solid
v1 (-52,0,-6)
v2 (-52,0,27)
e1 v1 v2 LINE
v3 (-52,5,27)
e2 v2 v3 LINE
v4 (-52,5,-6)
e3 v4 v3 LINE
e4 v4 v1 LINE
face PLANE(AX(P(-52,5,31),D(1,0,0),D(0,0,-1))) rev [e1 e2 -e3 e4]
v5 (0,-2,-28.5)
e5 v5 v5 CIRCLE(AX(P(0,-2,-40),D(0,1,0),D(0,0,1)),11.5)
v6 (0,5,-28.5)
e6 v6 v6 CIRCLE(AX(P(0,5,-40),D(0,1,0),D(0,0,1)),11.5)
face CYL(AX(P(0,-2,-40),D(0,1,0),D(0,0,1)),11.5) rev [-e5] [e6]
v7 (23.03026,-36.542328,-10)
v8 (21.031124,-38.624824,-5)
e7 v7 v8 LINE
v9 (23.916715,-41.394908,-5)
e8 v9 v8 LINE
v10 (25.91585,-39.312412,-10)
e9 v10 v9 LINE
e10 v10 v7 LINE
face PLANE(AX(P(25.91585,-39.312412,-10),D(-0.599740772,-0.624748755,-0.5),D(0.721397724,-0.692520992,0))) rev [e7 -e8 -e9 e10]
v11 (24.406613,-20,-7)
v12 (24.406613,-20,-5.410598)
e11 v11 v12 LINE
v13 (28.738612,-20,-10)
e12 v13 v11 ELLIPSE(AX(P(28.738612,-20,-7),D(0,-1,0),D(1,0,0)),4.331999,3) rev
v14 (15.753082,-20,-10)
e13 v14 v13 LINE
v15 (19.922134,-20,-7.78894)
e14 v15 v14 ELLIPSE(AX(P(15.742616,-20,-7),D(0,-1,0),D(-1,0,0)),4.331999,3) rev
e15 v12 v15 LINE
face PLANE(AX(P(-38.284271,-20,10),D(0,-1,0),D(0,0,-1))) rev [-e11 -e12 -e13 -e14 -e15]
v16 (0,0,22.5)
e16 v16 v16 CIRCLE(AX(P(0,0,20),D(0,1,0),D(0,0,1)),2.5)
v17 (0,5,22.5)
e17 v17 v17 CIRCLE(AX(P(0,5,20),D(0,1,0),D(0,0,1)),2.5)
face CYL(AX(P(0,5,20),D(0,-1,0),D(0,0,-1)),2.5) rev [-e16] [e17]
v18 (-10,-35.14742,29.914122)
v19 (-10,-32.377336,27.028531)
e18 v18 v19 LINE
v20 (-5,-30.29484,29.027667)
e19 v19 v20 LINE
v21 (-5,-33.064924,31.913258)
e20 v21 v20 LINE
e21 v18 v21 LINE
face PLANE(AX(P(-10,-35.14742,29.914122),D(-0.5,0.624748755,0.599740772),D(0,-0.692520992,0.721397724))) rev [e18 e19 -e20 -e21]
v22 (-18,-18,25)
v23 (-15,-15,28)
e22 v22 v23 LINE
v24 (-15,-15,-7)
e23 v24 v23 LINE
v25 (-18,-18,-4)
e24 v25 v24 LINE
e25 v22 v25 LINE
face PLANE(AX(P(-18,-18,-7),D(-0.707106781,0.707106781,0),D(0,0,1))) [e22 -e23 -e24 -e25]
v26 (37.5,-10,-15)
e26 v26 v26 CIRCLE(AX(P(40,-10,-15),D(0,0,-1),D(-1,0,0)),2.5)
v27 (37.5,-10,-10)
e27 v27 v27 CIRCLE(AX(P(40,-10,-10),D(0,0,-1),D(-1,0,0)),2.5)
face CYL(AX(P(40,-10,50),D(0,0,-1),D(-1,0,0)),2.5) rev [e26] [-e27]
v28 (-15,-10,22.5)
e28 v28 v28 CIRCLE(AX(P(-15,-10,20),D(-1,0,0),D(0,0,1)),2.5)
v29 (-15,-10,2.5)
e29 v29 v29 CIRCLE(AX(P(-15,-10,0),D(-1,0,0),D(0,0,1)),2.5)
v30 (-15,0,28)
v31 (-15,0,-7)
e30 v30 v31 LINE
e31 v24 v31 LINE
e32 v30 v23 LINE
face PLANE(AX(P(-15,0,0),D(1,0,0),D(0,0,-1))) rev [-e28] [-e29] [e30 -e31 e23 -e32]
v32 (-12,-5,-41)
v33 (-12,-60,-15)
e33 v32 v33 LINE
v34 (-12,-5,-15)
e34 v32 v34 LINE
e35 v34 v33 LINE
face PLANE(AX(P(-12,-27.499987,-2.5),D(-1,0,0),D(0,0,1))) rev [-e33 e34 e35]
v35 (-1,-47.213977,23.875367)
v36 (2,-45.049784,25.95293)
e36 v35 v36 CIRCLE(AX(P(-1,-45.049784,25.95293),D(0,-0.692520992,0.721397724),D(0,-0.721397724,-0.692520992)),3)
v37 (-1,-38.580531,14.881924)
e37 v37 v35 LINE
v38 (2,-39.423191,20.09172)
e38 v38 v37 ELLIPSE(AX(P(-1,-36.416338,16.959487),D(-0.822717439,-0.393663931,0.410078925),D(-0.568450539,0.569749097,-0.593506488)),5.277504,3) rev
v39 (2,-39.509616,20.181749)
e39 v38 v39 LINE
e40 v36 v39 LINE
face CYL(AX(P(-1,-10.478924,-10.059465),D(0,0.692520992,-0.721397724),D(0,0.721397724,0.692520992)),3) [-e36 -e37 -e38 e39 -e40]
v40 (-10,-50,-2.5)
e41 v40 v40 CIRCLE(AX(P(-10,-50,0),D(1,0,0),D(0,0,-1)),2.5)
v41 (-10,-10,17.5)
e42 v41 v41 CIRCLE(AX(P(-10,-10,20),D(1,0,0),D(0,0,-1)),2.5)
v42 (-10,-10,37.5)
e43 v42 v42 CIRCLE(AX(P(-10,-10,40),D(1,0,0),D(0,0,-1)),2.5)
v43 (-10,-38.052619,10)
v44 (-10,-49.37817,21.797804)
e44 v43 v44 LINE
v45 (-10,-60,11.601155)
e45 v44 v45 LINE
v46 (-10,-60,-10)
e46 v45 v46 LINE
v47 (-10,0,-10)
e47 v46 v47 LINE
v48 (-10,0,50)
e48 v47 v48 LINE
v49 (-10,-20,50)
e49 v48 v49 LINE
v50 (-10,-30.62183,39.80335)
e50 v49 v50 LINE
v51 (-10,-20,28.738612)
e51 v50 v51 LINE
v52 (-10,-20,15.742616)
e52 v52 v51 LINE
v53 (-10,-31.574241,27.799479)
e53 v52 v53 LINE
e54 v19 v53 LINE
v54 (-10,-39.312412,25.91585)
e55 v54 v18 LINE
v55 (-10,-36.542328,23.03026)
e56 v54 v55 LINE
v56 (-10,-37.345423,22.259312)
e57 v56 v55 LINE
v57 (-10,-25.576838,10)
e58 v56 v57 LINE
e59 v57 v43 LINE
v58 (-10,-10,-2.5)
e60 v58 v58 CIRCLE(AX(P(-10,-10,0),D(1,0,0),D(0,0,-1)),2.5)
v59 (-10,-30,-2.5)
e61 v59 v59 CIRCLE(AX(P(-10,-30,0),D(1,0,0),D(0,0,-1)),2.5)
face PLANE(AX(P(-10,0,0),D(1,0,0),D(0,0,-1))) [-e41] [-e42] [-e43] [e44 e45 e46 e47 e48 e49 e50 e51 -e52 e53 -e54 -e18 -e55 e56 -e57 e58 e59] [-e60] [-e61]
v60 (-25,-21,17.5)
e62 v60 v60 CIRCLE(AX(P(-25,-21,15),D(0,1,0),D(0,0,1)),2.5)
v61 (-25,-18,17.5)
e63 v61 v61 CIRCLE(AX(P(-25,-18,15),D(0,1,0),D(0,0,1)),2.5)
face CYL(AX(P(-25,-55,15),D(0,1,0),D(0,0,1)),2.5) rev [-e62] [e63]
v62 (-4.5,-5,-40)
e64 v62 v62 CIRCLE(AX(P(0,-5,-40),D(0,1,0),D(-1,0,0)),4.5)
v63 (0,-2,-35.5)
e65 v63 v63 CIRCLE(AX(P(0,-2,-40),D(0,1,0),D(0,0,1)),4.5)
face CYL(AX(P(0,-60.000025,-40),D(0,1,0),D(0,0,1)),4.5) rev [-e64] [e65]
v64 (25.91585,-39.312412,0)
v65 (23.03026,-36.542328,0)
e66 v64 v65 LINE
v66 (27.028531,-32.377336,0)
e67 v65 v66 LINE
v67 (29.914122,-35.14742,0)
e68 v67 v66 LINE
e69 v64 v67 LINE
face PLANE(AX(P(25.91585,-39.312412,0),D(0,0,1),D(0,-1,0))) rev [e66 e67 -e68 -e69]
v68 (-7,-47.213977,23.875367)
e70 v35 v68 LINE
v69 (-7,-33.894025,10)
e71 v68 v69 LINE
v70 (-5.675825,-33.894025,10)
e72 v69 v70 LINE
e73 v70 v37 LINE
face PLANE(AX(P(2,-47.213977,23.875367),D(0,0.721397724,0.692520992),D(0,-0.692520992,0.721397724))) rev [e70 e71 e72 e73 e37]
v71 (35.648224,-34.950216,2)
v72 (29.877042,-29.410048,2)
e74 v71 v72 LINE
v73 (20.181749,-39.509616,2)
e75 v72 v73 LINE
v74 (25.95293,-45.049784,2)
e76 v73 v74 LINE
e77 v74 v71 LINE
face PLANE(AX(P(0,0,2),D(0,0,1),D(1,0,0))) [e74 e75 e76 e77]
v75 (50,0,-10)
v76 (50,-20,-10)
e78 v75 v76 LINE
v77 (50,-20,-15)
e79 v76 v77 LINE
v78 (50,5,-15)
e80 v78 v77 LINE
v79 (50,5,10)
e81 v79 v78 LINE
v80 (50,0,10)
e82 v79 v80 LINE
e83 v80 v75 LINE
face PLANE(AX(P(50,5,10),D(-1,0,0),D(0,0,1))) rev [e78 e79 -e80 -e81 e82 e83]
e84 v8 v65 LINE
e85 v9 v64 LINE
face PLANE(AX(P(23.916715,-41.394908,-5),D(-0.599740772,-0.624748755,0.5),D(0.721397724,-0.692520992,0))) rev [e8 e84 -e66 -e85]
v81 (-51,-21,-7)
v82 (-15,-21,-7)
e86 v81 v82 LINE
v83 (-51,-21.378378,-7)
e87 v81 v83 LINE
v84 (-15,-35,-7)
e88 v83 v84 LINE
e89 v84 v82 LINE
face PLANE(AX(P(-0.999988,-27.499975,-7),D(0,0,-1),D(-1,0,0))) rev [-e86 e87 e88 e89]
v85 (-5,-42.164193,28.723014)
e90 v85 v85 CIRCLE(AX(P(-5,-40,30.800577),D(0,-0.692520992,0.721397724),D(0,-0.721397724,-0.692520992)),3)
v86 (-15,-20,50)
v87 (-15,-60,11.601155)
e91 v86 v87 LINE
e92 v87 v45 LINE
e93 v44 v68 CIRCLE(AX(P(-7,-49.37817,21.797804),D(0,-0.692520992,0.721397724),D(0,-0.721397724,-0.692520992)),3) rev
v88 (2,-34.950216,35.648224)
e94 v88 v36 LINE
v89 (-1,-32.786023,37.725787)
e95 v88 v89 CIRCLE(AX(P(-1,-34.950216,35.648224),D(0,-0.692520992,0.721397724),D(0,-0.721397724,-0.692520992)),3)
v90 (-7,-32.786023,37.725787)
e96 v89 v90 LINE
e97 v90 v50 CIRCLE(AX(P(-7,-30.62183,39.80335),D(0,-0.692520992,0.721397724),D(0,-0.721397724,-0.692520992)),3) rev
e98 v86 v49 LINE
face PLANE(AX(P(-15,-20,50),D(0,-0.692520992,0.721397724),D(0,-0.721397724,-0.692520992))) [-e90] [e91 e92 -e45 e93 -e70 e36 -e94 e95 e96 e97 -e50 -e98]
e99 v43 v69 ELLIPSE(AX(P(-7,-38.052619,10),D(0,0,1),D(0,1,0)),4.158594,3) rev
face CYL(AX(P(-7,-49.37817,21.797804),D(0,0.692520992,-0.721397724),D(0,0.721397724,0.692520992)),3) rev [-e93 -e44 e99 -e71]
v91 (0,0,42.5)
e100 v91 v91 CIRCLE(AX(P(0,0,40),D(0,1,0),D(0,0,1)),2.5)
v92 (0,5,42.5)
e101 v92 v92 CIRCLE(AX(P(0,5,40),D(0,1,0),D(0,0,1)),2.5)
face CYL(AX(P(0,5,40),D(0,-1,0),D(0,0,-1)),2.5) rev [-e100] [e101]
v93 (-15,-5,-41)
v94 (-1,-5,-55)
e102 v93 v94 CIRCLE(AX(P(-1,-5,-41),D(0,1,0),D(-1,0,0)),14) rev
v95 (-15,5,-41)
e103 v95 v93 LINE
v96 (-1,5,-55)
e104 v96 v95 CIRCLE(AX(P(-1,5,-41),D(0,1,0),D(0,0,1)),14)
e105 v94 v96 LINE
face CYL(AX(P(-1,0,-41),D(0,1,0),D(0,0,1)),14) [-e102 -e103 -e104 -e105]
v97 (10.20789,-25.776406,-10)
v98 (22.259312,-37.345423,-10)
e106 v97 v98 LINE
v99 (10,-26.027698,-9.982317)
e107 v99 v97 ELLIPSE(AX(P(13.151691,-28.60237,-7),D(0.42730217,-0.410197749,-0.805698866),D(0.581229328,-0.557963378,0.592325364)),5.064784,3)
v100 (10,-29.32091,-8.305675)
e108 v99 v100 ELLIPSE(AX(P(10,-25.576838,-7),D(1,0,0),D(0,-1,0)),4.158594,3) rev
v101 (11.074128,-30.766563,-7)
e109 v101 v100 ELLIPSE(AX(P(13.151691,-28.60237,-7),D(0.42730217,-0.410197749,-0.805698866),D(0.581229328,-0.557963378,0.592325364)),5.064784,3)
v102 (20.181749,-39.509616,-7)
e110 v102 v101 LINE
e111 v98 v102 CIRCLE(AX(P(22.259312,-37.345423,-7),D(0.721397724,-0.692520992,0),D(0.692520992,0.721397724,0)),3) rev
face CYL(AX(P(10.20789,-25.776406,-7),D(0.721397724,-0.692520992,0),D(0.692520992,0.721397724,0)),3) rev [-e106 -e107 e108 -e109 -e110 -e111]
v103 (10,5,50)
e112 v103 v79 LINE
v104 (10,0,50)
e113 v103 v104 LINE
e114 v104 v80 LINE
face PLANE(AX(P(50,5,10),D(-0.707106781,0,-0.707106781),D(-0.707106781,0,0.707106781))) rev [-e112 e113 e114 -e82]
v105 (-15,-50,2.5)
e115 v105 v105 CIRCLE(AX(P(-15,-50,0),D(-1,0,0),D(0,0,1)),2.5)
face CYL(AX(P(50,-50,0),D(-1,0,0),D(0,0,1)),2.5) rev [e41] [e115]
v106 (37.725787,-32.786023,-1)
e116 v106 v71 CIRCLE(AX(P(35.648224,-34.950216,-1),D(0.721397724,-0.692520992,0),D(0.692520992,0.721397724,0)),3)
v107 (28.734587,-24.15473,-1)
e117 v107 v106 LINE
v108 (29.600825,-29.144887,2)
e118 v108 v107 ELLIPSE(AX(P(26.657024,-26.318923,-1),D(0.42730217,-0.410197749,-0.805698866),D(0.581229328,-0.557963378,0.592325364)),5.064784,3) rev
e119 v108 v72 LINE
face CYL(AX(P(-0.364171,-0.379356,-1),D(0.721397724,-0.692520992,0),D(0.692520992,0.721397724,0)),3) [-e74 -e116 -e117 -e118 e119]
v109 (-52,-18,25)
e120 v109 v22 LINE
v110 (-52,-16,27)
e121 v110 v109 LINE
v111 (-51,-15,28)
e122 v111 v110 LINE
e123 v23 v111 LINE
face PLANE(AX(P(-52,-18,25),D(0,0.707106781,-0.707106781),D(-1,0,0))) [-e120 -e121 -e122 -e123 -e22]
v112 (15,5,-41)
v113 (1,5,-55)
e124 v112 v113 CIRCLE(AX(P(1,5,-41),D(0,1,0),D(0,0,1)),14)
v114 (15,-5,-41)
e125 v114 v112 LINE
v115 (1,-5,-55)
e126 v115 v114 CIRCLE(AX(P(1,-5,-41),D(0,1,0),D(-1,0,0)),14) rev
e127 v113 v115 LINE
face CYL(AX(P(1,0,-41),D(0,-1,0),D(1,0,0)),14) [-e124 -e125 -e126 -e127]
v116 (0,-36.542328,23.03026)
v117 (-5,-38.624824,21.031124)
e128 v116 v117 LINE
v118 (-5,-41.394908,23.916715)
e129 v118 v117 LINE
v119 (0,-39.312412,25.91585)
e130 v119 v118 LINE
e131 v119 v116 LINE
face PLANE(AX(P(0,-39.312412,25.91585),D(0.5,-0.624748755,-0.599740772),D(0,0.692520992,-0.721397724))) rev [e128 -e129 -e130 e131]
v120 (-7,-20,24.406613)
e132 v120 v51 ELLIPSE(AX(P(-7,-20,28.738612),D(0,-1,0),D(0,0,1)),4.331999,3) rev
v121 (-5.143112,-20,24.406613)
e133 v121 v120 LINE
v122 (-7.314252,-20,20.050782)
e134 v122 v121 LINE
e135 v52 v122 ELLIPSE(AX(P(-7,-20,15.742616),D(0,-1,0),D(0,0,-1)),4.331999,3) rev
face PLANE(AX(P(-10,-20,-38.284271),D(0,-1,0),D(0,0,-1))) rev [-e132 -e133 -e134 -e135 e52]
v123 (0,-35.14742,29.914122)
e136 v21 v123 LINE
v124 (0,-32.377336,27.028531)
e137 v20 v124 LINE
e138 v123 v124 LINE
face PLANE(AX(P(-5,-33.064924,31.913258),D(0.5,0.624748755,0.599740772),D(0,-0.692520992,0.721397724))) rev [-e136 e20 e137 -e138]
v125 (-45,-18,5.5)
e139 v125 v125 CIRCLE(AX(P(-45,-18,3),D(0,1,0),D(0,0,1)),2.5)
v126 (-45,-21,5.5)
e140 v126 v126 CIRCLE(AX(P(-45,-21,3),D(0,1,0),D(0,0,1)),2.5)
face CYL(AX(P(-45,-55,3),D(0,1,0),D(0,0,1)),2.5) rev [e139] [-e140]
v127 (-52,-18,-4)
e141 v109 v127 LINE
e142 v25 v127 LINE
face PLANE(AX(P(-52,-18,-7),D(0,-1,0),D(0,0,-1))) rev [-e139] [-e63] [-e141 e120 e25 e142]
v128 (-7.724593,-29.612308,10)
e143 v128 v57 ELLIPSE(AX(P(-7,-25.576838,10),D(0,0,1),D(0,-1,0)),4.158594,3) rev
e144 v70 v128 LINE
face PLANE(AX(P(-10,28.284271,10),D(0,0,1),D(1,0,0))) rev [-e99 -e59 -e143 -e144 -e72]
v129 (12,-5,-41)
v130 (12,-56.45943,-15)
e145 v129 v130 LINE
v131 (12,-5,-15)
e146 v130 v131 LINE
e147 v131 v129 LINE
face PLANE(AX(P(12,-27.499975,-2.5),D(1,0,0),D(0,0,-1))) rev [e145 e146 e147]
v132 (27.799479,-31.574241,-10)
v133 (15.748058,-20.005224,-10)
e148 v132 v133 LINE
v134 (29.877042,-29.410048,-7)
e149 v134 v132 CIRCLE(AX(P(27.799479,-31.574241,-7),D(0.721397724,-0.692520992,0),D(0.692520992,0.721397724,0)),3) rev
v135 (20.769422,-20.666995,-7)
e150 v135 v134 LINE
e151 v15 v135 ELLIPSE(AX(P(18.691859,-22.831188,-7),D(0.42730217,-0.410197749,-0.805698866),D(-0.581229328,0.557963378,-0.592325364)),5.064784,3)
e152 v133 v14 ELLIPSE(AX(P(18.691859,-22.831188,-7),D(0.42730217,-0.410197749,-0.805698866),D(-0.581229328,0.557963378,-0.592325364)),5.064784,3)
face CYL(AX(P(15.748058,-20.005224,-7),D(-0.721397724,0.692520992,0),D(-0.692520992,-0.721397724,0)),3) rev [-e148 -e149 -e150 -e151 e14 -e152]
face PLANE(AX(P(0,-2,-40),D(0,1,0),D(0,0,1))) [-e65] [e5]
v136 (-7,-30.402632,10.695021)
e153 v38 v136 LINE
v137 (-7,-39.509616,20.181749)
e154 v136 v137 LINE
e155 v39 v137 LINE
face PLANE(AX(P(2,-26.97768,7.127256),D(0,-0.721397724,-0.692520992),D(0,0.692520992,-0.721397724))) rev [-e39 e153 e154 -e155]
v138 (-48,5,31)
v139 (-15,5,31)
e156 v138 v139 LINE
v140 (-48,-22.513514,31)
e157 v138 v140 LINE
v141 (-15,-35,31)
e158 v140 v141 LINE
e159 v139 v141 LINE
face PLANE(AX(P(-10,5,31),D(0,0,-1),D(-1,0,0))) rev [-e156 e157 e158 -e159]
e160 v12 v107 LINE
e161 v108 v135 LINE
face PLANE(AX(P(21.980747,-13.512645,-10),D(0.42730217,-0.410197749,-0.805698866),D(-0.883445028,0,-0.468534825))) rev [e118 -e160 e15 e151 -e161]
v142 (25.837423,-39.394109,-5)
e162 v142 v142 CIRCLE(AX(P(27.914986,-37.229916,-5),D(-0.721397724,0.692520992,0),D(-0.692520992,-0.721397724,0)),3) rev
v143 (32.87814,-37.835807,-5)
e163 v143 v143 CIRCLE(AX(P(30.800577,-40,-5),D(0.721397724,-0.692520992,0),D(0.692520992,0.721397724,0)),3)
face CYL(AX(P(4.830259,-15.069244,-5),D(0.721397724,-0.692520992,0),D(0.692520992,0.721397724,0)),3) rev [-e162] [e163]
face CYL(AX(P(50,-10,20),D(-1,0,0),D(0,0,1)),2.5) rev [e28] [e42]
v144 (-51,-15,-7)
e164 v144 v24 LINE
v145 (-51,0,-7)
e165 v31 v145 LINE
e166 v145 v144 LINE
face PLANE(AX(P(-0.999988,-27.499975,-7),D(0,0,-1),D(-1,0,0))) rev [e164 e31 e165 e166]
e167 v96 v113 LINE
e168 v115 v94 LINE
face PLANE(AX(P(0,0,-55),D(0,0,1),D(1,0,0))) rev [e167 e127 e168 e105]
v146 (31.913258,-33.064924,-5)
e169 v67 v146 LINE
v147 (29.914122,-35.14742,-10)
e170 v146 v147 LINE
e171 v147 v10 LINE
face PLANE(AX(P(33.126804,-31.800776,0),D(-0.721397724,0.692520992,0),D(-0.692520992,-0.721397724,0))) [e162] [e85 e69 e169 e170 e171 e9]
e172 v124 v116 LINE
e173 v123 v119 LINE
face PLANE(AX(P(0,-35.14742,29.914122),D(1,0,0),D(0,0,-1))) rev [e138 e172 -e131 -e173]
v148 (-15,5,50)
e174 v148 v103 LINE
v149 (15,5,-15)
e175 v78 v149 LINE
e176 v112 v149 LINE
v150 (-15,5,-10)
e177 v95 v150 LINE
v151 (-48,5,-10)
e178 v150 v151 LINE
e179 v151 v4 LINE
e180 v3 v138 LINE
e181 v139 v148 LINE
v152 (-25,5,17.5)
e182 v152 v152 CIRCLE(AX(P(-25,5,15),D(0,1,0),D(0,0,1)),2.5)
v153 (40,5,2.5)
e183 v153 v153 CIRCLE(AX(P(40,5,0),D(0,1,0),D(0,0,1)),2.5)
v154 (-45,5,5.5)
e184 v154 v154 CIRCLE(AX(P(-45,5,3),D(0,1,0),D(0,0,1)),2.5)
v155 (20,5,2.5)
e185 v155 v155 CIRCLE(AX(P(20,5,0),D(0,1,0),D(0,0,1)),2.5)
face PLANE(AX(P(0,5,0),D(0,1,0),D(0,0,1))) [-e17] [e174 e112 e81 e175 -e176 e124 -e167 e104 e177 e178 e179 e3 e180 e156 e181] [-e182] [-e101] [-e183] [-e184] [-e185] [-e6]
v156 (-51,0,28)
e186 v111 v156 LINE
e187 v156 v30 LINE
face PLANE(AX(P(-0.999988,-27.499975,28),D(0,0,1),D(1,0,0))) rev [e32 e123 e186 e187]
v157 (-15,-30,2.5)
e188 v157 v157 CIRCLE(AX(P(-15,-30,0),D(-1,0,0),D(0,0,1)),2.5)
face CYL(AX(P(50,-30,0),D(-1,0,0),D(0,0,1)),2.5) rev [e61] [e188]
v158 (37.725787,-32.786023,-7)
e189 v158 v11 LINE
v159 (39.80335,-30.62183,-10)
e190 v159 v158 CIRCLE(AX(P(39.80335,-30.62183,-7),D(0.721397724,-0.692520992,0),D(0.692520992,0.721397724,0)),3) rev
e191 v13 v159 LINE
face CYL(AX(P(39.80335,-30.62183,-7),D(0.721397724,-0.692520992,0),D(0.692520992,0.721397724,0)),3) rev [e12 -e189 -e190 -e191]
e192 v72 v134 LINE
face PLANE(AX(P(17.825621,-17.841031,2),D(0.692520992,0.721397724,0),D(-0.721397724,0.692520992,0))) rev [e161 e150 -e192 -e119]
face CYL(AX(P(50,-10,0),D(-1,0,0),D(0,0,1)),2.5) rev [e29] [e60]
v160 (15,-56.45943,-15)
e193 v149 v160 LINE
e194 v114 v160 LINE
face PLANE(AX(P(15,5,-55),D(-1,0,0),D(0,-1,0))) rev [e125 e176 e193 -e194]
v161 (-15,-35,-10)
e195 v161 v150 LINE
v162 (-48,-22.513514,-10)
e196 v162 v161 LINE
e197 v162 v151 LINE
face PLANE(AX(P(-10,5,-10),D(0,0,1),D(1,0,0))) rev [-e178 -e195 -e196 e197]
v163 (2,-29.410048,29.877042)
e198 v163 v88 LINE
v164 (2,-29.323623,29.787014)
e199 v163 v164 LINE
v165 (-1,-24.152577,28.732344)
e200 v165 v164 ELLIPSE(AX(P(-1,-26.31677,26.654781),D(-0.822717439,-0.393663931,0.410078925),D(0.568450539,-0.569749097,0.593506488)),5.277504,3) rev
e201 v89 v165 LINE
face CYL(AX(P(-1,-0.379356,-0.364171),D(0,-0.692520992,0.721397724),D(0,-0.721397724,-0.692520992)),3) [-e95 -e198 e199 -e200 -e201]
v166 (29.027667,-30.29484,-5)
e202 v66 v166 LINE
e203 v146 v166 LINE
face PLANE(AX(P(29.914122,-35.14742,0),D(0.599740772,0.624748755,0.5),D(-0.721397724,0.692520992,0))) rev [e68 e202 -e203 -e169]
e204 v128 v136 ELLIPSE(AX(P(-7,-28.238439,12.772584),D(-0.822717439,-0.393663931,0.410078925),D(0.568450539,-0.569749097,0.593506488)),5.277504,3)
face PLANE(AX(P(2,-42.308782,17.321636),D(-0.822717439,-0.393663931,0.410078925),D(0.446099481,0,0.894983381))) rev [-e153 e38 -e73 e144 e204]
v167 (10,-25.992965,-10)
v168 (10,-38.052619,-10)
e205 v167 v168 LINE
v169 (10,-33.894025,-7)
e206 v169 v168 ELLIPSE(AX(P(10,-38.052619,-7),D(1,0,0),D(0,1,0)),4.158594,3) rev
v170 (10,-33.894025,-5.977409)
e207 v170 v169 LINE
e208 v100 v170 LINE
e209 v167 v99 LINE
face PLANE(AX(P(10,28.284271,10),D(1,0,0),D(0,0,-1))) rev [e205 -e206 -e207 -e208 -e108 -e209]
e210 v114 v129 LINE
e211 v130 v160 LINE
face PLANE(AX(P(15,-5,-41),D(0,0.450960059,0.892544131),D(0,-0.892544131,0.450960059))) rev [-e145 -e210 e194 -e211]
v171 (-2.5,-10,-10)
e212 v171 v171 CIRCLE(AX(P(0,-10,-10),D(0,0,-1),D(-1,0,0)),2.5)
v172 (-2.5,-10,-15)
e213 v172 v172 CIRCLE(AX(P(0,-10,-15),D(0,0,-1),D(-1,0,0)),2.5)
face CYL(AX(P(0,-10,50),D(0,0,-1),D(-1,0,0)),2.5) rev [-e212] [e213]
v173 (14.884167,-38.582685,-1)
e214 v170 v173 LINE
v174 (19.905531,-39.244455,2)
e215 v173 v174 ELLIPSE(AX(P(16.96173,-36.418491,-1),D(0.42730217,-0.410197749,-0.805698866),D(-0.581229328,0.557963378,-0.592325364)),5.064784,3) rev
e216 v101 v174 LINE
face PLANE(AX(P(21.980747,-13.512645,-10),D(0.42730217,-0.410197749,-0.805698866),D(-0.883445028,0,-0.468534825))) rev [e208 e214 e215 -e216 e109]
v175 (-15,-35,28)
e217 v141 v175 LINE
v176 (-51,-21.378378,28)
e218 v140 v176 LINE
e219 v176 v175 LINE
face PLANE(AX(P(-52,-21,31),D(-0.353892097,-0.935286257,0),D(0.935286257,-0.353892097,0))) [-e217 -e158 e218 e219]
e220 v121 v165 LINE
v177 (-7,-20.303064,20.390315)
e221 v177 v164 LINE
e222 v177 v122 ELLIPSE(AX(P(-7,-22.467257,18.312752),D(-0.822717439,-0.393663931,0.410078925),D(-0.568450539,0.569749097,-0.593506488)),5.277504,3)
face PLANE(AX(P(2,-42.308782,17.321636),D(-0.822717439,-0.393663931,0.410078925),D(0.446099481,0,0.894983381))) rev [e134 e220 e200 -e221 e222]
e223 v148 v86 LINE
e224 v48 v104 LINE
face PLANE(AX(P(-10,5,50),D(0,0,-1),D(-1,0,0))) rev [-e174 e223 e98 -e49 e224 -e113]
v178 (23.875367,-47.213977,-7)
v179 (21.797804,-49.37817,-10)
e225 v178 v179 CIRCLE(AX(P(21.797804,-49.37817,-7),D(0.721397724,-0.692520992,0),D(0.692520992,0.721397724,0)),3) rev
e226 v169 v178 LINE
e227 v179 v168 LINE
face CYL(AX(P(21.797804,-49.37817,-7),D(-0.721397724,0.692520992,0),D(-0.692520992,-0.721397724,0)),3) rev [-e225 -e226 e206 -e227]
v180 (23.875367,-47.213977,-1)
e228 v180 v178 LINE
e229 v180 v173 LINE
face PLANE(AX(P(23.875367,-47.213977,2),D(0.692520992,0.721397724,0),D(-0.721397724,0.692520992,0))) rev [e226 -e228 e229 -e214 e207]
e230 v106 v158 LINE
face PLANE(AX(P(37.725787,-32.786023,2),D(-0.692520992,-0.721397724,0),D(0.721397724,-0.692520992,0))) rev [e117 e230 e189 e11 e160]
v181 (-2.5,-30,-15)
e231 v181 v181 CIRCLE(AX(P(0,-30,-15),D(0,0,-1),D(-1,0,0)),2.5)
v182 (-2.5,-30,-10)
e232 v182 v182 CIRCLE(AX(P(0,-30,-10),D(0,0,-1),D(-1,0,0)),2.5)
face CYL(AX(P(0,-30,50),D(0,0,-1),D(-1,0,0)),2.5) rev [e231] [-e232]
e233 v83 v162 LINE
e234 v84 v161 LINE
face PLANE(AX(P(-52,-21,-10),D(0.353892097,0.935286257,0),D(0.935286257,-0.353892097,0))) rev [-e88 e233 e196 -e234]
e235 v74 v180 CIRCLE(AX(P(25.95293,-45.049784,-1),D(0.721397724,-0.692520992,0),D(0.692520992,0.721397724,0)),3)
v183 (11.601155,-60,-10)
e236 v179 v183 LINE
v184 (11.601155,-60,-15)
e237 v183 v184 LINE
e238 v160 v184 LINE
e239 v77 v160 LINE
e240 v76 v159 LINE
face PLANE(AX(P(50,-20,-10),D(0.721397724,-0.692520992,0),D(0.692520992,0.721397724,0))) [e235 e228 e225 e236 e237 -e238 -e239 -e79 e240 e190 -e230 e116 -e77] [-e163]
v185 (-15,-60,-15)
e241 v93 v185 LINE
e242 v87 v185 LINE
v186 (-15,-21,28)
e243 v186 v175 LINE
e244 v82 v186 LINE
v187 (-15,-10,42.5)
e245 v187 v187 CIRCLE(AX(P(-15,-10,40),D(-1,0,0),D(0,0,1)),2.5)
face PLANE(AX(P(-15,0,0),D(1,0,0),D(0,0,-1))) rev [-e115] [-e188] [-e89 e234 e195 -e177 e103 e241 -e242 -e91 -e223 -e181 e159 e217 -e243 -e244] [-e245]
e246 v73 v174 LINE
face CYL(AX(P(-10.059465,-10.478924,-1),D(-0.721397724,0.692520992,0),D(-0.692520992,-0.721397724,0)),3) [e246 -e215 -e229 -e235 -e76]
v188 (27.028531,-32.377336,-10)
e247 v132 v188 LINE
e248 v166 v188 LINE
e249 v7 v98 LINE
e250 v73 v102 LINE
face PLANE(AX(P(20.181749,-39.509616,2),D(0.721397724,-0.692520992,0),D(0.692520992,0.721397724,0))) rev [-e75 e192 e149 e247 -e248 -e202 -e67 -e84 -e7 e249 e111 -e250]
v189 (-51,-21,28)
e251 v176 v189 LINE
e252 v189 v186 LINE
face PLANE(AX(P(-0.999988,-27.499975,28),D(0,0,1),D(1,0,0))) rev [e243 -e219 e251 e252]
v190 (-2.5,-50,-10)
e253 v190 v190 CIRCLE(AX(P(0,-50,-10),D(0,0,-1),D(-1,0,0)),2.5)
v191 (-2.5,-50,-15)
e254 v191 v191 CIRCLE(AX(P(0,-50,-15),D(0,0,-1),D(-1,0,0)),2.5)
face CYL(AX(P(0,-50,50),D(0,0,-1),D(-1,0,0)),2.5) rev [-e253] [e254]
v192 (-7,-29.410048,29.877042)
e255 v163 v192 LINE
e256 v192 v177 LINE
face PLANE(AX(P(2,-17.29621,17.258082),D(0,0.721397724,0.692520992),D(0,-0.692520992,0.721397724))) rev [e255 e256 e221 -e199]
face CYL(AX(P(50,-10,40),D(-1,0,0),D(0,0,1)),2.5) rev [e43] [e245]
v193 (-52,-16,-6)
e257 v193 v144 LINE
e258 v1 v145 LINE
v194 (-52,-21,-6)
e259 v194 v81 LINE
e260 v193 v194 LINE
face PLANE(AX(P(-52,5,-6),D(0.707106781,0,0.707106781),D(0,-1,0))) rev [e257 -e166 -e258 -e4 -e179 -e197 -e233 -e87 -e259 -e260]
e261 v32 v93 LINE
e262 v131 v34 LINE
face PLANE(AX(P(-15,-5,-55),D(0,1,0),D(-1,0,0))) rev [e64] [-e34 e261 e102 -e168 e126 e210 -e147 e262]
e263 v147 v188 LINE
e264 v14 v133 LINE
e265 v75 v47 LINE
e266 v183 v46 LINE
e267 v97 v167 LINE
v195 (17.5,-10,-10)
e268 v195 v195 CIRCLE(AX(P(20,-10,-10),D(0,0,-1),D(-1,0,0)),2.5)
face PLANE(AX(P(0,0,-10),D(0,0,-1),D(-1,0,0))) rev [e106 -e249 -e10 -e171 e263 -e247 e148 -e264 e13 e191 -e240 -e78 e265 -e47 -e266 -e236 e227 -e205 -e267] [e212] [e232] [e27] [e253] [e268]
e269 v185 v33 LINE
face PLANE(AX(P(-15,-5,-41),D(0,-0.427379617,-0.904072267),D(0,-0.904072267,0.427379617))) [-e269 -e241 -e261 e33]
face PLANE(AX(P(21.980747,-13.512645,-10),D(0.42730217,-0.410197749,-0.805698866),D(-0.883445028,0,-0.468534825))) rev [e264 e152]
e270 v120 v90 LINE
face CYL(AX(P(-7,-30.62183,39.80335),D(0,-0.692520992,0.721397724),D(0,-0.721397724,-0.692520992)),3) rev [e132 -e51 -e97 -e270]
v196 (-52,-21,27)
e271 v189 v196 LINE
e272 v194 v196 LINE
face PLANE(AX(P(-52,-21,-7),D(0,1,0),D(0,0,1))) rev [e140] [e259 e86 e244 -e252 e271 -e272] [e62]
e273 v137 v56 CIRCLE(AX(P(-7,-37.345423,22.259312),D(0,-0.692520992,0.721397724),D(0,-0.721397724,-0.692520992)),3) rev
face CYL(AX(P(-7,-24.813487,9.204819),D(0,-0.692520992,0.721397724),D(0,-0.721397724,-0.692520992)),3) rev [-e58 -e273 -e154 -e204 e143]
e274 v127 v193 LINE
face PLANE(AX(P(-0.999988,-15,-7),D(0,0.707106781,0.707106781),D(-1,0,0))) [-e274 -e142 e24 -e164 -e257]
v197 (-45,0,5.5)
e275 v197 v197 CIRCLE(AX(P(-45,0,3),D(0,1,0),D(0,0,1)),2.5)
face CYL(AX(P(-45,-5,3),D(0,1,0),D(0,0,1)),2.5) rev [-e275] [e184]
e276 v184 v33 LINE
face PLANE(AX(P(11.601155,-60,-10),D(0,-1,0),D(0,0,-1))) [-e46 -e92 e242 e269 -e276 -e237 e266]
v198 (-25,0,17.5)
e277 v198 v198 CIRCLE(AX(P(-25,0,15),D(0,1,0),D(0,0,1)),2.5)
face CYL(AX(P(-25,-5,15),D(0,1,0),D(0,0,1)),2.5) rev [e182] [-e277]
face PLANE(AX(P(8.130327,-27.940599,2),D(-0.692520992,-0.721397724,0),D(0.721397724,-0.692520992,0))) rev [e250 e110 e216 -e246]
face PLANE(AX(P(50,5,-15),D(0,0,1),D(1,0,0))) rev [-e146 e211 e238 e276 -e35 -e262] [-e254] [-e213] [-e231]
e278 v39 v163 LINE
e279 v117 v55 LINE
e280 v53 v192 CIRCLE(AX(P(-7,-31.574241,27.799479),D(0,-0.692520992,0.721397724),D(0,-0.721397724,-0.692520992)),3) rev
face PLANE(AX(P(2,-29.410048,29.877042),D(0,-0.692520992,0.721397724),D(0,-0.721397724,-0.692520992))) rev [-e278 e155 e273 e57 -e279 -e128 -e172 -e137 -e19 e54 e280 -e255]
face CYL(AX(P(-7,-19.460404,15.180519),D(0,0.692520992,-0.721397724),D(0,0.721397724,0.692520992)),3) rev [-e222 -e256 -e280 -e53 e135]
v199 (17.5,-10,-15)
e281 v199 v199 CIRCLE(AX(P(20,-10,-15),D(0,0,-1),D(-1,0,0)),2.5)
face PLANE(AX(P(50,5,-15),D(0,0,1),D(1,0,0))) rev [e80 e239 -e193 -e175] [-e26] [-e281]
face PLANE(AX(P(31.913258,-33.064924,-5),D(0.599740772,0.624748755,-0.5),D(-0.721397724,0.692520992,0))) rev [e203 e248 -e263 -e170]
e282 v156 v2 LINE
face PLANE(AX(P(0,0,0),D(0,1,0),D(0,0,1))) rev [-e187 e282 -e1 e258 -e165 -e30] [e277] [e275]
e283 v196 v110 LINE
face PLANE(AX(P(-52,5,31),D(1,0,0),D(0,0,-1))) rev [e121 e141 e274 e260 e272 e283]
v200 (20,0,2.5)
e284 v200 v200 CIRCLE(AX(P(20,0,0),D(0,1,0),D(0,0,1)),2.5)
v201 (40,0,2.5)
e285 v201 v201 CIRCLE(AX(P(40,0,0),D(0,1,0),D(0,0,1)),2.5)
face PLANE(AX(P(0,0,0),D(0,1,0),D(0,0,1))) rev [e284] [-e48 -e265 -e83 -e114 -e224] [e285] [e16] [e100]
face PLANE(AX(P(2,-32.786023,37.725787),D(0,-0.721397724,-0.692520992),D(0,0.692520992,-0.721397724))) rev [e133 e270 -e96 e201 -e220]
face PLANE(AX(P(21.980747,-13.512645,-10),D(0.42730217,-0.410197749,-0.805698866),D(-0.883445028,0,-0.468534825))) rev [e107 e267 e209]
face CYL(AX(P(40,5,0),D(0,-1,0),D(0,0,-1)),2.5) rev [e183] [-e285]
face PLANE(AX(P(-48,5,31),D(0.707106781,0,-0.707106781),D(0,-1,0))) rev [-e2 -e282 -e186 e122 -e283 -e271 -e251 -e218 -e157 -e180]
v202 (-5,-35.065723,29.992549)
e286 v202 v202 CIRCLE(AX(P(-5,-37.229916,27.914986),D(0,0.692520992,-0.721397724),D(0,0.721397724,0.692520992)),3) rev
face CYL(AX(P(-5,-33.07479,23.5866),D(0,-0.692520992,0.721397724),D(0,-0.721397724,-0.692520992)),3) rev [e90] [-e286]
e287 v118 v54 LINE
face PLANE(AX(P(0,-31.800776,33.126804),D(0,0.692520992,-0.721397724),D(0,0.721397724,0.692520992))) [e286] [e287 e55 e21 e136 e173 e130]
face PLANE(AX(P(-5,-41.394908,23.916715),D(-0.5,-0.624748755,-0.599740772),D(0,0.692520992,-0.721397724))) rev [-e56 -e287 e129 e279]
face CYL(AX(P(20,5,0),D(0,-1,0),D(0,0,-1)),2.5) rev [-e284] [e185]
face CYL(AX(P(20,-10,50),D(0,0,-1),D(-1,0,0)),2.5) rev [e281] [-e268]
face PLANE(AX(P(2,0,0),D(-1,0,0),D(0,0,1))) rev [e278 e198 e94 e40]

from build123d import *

# Parameters (mm, degrees)
SKETCH1_R           = 2.5
BOSS_EXTRUDE1_DEPTH = 5
BOSS_EXTRUDE3_DEPTH = 5
BOSS_EXTRUDE4_DEPTH = 5
SKETCH5_R           = 2.5
CUT_EXTRUDE1_DEPTH  = 102.612007165
SKETCH6_R           = 2.5
CUT_EXTRUDE2_DEPTH  = 103.610915599
SKETCH7_W           = 30
SKETCH7_H           = 10
BOSS_EXTRUDE5_DEPTH = 40
SKETCH8_R           = 11.5
CUT_EXTRUDE3_DEPTH  = 7
SKETCH9_R           = 4.5
CUT_EXTRUDE4_DEPTH  = 100.76973489
FILLET1_R           = 14
RIB2_REACH          = 106.163
SKETCH10_WALL_W     = 271.162511258
SKETCH10_WALL_H     = 3
RIB11_REACH         = 107.423
SKETCH12_WALL_W     = 270.500688682
SKETCH12_WALL_H     = 3
BOSS_EXTRUDE6_DEPTH = 12
SKETCH15_R          = 3
CUT_EXTRUDE5_DEPTH  = 10
CUT_EXTRUDE6_DEPTH  = 4
BOSS_EXTRUDE7_DEPTH = 12
SKETCH19_R          = 3
CUT_EXTRUDE8_DEPTH  = 36
CUT_EXTRUDE9_DEPTH  = 4
CUT_EXTRUDE10_DEPTH = 23
CUT_EXTRUDE16_DEPTH = 21
FILLET2_R           = 3
SKETCH22_R          = 2.5
CUT_EXTRUDE12_DEPTH = 10
SKETCH30_W          = 35
SKETCH30_H          = 3
BOSS_EXTRUDE8_DEPTH = 37
RIB13_START         = -3
RIB13_DEPTH         = 3
RIB14_START         = -3
RIB14_DEPTH         = 3
CHAMFER1_SIZE       = 4
CUT_EXTRUDE13_REACH = 101.77
SKETCH26_W          = 20
SKETCH26_H          = 20
CUT_EXTRUDE14_REACH = 132.495
SKETCH27_W          = 20
SKETCH27_H          = 20
SKETCH28_W          = 20
SKETCH28_H          = 20
CUT_EXTRUDE15_DEPTH = 60
SKETCH31_R          = 2.5
CUT_EXTRUDE17_DEPTH = 37
CHAMFER2_SIZE       = 3


# Read off the part's stored shape, not the designer's step: Rib13, Rib14
with BuildPart() as part:
    # Sketch1 → Boss-Extrude1 (new body)
    with BuildSketch(Plane(origin=(0, 0, 0), x_dir=(1, 0, 0), z_dir=(0, 1, 0))):
        Polygon((50, -10), (10, -50), (-10, -50), (-10, -31), (-52, -31), (-52, 10), (-10, 10), (-10, 15), (50, 15), align=None)
        with Locations(Location((20, 0, 0), (0, 0, 270))):
            Circle(SKETCH1_R, mode=Mode.SUBTRACT)
        with Locations(Location((40, 0, 0), (0, 0, 270))):
            Circle(SKETCH1_R, mode=Mode.SUBTRACT)
        with Locations(Location((0, -20, 0), (0, 0, 270))):
            Circle(SKETCH1_R, mode=Mode.SUBTRACT)
        with Locations(Location((0, -40, 0), (0, 0, 270))):
            Circle(SKETCH1_R, mode=Mode.SUBTRACT)
    extrude(amount=BOSS_EXTRUDE1_DEPTH)

    # Sketch3 → Boss-Extrude3 (add)
    with BuildSketch(Plane(origin=(0, 0, -15), x_dir=(-1, 0, 0), z_dir=(0, 0, -1))):
        Polygon((-50, 5), (-50, -20), (-11.601154601, -60), (10, -60), (10, 5), align=None)
    extrude(amount=-BOSS_EXTRUDE3_DEPTH)

    # Sketch4 → Boss-Extrude4 (add)
    with BuildSketch(Plane(origin=(-10, 0, 0), x_dir=(0, 0, -1), z_dir=(1, 0, 0))):
        Polygon((15, 5), (-50, 5), (-50, -20), (-11.601154601, -60), (15, -60), align=None)
    extrude(amount=-BOSS_EXTRUDE4_DEPTH)

    # Sketch5 → Cut-Extrude1 (cut, through all)
    with BuildSketch(Plane.ZY.offset(15)):
        with Locations((0, -10)):
            Circle(SKETCH5_R)
        with Locations((0, -30)):
            Circle(SKETCH5_R)
        with Locations((0, -50)):
            Circle(SKETCH5_R)
        with Locations((20, -10)):
            Circle(SKETCH5_R)
        with Locations((40, -10)):
            Circle(SKETCH5_R)
    extrude(amount=-CUT_EXTRUDE1_DEPTH, mode=Mode.SUBTRACT)

    # Sketch6 → Cut-Extrude2 (cut, through all)
    with BuildSketch(Plane(origin=(0, 0, -15), x_dir=(-1, 0, 0), z_dir=(0, 0, -1))):
        with Locations((0, -10)):
            Circle(SKETCH6_R)
        with Locations((0, -30)):
            Circle(SKETCH6_R)
        with Locations((0, -50)):
            Circle(SKETCH6_R)
        with Locations((-20, -10)):
            Circle(SKETCH6_R)
        with Locations((-40, -10)):
            Circle(SKETCH6_R)
    extrude(amount=-CUT_EXTRUDE2_DEPTH, mode=Mode.SUBTRACT)

    # Sketch7 → Boss-Extrude5 (add)
    with BuildSketch(Plane(origin=(0, 0, -15), x_dir=(-1, 0, 0), z_dir=(0, 0, -1))):
        Rectangle(SKETCH7_W, SKETCH7_H)
    extrude(amount=BOSS_EXTRUDE5_DEPTH)

    # Sketch8 → Cut-Extrude3 (cut)
    with BuildSketch(Plane(origin=(0, 5, 0), x_dir=(1, 0, 0), z_dir=(0, 1, 0))):
        with Locations(Location((0, 40, 0), (0, 0, 270))):
            Circle(SKETCH8_R)
    extrude(amount=-CUT_EXTRUDE3_DEPTH, mode=Mode.SUBTRACT)

    # Sketch9 → Cut-Extrude4 (cut, through all)
    with BuildSketch(Plane(origin=(0, 5, 0), x_dir=(1, 0, 0), z_dir=(0, 1, 0))):
        with Locations(Location((0, 40, 0), (0, 0, 270))):
            Circle(SKETCH9_R)
    extrude(amount=-CUT_EXTRUDE4_DEPTH, mode=Mode.SUBTRACT)

    # Fillet1
    fillet1_edges = [part.edges().sort_by_distance(p)[0] for p in [
        (-15, 0, -55),
        (15, 0, -55),
    ]]
    fillet(fillet1_edges, radius=FILLET1_R)

    # Sketch10 wall → Rib2 (add, up to next)
    with BuildSketch(Plane(origin=(-15, -32.5, -28), x_dir=(0, -0.904072266505, 0.427379616893), z_dir=(0, 0.427379616893, 0.904072266505)), mode=Mode.PRIVATE) as rib2_sk1:
        with Locations((0, 1.5)):
            Rectangle(SKETCH10_WALL_W, SKETCH10_WALL_H)
    rib2_tool1 = extrude(rib2_sk1.sketch, amount=RIB2_REACH, mode=Mode.PRIVATE) - part.part
    add(rib2_tool1.solids().sort_by_distance((-15, -32.5, -28))[0])

    # Sketch12 wall → Rib11 (add, up to next)
    with BuildSketch(Plane(origin=(15, -30.729714793, -28), x_dir=(0, -0.892544130701, 0.450960058931), z_dir=(0, -0.450960058931, -0.892544130701)), mode=Mode.PRIVATE) as rib11_sk1:
        with Locations((0, 1.5)):
            Rectangle(SKETCH12_WALL_W, SKETCH12_WALL_H)
    rib11_tool1 = extrude(rib11_sk1.sketch, amount=-RIB11_REACH, mode=Mode.PRIVATE) - part.part
    add(rib11_tool1.solids().sort_by_distance((15, -30.729714793, -28))[0])

    # Sketch13 → Boss-Extrude6 (add)
    with BuildSketch(Plane(origin=(-10, 0, 0), x_dir=(0, 0, -1), z_dir=(1, 0, 0))):
        Polygon((-23.875367383, -47.213977239), (-37.725787218, -32.786022761), (-19.335645208, -15.132017263), (-17.258082232, -17.296210435), (-29.877042452, -29.410047999), (-20.181748567, -39.509616133), (-7.127255585, -26.977679689), (-5.04969261, -29.14187286), align=None)
    extrude(amount=BOSS_EXTRUDE6_DEPTH)

    # Sketch15 → Cut-Extrude5 (cut)
    with BuildSketch(Plane(origin=(0, -34.570859839, 36.012395143), x_dir=(1, 0, 0), z_dir=(0, -0.6925209917473573, 0.7213977238592154))):
        with Locations(Location((-5, -7.525862616, 0), (0, 0, 270))):
            Circle(SKETCH15_R)
    extrude(amount=-CUT_EXTRUDE5_DEPTH, mode=Mode.SUBTRACT)

    # Sketch16 → Cut-Extrude6 (cut)
    with BuildSketch(Plane(origin=(0, -29.030691905, 30.241213352), x_dir=(1, 0, 0), z_dir=(0, 0.692520991747357, -0.7213977238592156))):
        Polygon((0, 4.63911127), (0, 10.412613962), (-5, 13.299365308), (-10, 10.412613962), (-10, 4.63911127), (-5, 1.752359924), align=None)
    extrude(amount=-CUT_EXTRUDE6_DEPTH, mode=Mode.SUBTRACT)

    # Sketch18 → Boss-Extrude7 (add)
    with BuildSketch(Plane.XY.offset(-10)):
        Polygon((37.725787218, -32.786022761), (23.875367383, -47.213977239), (6.052764198, -30.104792631), (8.130327173, -27.940599459), (20.181748567, -39.509616133), (29.877042452, -29.410047999), (17.825621058, -17.841031325), (19.903184033, -15.676838154), align=None)
    extrude(amount=BOSS_EXTRUDE7_DEPTH)

    # Sketch19 → Cut-Extrude8 (cut)
    with BuildSketch(Plane(origin=(36.012395143, -34.570859839, 0), x_dir=(0, 0, -1), z_dir=(0.7213977238592155, -0.6925209917473573, 0))):
        with Locations(Location((5, -7.525862616, 0), (0, 0, 90))):
            Circle(SKETCH19_R)
    extrude(amount=-CUT_EXTRUDE8_DEPTH, mode=Mode.SUBTRACT)

    # Sketch20 → Cut-Extrude9 (cut)
    with BuildSketch(Plane(origin=(30.241213352, -29.030691905, 0), x_dir=(0, 0, 1), z_dir=(-0.7213977238592155, 0.6925209917473573, 0))):
        Polygon((0, -4.63911127), (-5, -1.752359924), (-10, -4.63911127), (-10, -10.412613962), (-5, -13.299365308), (0, -10.412613962), align=None)
    extrude(amount=-CUT_EXTRUDE9_DEPTH, mode=Mode.SUBTRACT)

    # Sketch21 → Cut-Extrude10 (cut)
    with BuildSketch(Plane(origin=(-12.13702776, -12.6431174, 0), x_dir=(0, 0, 1), z_dir=(-0.692520991747357, -0.7213977238592157, 0))):
        Polygon((-10, -25.214651165), (2, -41.537413908), (2, -25.214651165), align=None)
    extrude(amount=-CUT_EXTRUDE10_DEPTH, mode=Mode.SUBTRACT)

    # Sketch29 → Cut-Extrude16 (cut)
    with BuildSketch(Plane(origin=(0, 1.784837077, 1.713392075), x_dir=(1, 0, 0), z_dir=(0, 0.7213977238592151, 0.6925209917473576))):
        Polygon((-10, -24.427930044), (2, -24.427930044), (2, -41.795508388), align=None)
    extrude(amount=-CUT_EXTRUDE16_DEPTH, mode=Mode.SUBTRACT)

    # Fillet2
    # the kernel refuses this fillet: 3 mm, written as the material it adds along each edge
    with BuildSketch(Plane(origin=(35.287525381, -34.603955437, -10), x_dir=(-0.6925209917473568, -0.7213977238592159, 0), z_dir=(-0.7213977238592159, 0.6925209917473568, 0))) as fillet2_piece_1_section:
        with BuildLine():
            CenterArc((FILLET2_R, FILLET2_R), FILLET2_R, 180, 90)
            Line((0, FILLET2_R), (0, 0))
            Line((0, 0), (FILLET2_R, 0))
        make_face()
    fillet2_piece_1 = extrude(amount=31.705654863, mode=Mode.PRIVATE)
    fillet2_piece_1 = split(fillet2_piece_1, bisect_by=Plane(origin=(27.168396229, -27.751311097, 0.000464063), z_dir=(0.4273021697203565, -0.41019774884719234, -0.8056988659499105)), keep=Keep.TOP, mode=Mode.PRIVATE)
    add(fillet2_piece_1)
    with BuildSketch(Plane(origin=(2.719844244, -22.746692021, -10), x_dir=(0.6925209917473568, 0.7213977238592157, 0), z_dir=(0.7213977238592157, -0.6925209917473569, 0))) as fillet2_piece_2_section:
        with BuildLine():
            CenterArc((FILLET2_R, FILLET2_R), FILLET2_R, 180, 90)
            Line((0, FILLET2_R), (0, 0))
            Line((0, 0), (FILLET2_R, 0))
        make_face()
    fillet2_piece_2 = extrude(amount=31.705654863, mode=Mode.PRIVATE)
    fillet2_piece_2 = split(fillet2_piece_2, bisect_by=Plane(origin=(12.953271486, -31.599477719, -5.57934317), z_dir=(0.4273021697203565, -0.41019774884719234, -0.8056988659499105)), keep=Keep.TOP, mode=Mode.PRIVATE)
    add(fillet2_piece_2)
    with BuildSketch(Plane(origin=(-10, -32.786022761, 37.725787218), x_dir=(0, 0.721397723859215, 0.6925209917473576), z_dir=(0, 0.6925209917473576, -0.7213977238592151))) as fillet2_piece_3_section:
        with BuildLine():
            CenterArc((FILLET2_R, FILLET2_R), FILLET2_R, 180, 90)
            Line((0, FILLET2_R), (0, 0))
            Line((0, 0), (FILLET2_R, 0))
        make_face()
    fillet2_piece_3 = extrude(amount=32.992375983, mode=Mode.PRIVATE)
    fillet2_piece_3 = split(fillet2_piece_3, bisect_by=Plane(origin=(-3.605950739, -21.040183536, 26.491984379), z_dir=(-0.822717439175792, -0.3936639310194599, 0.41007892495266446)), keep=Keep.TOP, mode=Mode.PRIVATE)
    add(fillet2_piece_3)
    with BuildSketch(Plane(origin=(-10, -12.102302997, 11.847599303), x_dir=(0, -0.7213977238592152, -0.6925209917473575), z_dir=(0, -0.6925209917473575, 0.7213977238592153))) as fillet2_piece_4_section:
        with BuildLine():
            CenterArc((FILLET2_R, FILLET2_R), FILLET2_R, 180, 90)
            Line((0, FILLET2_R), (0, 0))
            Line((0, 0), (FILLET2_R, 0))
        make_face()
    fillet2_piece_4 = extrude(amount=32.492375983, mode=Mode.PRIVATE)
    fillet2_piece_4 = split(fillet2_piece_4, bisect_by=Plane(origin=(-5.484565801, -22.327549984, 21.487193874), z_dir=(-0.822717439175792, -0.3936639310194599, 0.41007892495266446)), keep=Keep.TOP, mode=Mode.PRIVATE)
    add(fillet2_piece_4)
    with BuildSketch(Plane(origin=(-10, -44.703523571, 25.592231496), x_dir=(0, 0.7213977238592155, 0.6925209917473572), z_dir=(0, 0.6925209917473573, -0.7213977238592155))) as fillet2_piece_5_section:
        with BuildLine():
            CenterArc((FILLET2_R, FILLET2_R), FILLET2_R, 180, 90)
            Line((0, FILLET2_R), (0, 0))
            Line((0, 0), (FILLET2_R, 0))
        make_face()
    fillet2_piece_5 = extrude(amount=24.992375983, mode=Mode.PRIVATE)
    fillet2_piece_5 = split(fillet2_piece_5, bisect_by=Plane(origin=(0.153979839, -37.082991212, 18.634681598), z_dir=(-0.822717439175792, -0.3936639310194599, 0.41007892495266446)), keep=Keep.TOP, mode=Mode.PRIVATE)
    add(fillet2_piece_5)
    with BuildSketch(Plane(origin=(-10, -29.559971741, 5.485225373), x_dir=(0, -0.7213977238592156, -0.692520991747357), z_dir=(0, -0.692520991747357, 0.7213977238592156))) as fillet2_piece_6_section:
        with BuildLine():
            CenterArc((FILLET2_R, FILLET2_R), FILLET2_R, 180, 90)
            Line((0, FILLET2_R), (0, 0))
            Line((0, 0), (FILLET2_R, 0))
        make_face()
    fillet2_piece_6 = extrude(amount=25.492375983, mode=Mode.PRIVATE)
    fillet2_piece_6 = split(fillet2_piece_6, bisect_by=Plane(origin=(-3.60504069, -36.469949644, 11.681680074), z_dir=(-0.822717439175792, -0.3936639310194599, 0.41007892495266446)), keep=Keep.TOP, mode=Mode.PRIVATE)
    add(fillet2_piece_6)
    with BuildSketch(Plane(origin=(14.492701104, -10.482930716, -10), x_dir=(0.692520991747357, 0.7213977238592155, 0), z_dir=(0.7213977238592156, -0.692520991747357, 0))) as fillet2_piece_7_section:
        with BuildLine():
            CenterArc((FILLET2_R, FILLET2_R), FILLET2_R, 180, 90)
            Line((0, FILLET2_R), (0, 0))
            Line((0, 0), (FILLET2_R, 0))
        make_face()
    fillet2_piece_7 = extrude(amount=32.205654863, mode=Mode.PRIVATE)
    fillet2_piece_7 = split(fillet2_piece_7, bisect_by=Plane(origin=(26.602387844, -21.146802925, -3.662208332), z_dir=(0.4273021697203565, -0.41019774884719234, -0.8056988659499105)), keep=Keep.TOP, mode=Mode.PRIVATE)
    add(fillet2_piece_7)
    with BuildSketch(Plane(origin=(23.875367383, -47.213977239, -10), x_dir=(-0.692520991747357, -0.7213977238592156, 0), z_dir=(-0.7213977238592156, 0.6925209917473572, 0))) as fillet2_piece_8_section:
        with BuildLine():
            CenterArc((FILLET2_R, FILLET2_R), FILLET2_R, 180, 90)
            Line((0, FILLET2_R), (0, 0))
            Line((0, 0), (FILLET2_R, 0))
        make_face()
    fillet2_piece_8 = extrude(amount=32.205654863, mode=Mode.PRIVATE)
    fillet2_piece_8 = split(fillet2_piece_8, bisect_by=Plane(origin=(11.791691904, -36.575075089, -3.662208332), z_dir=(0.4273021697203565, -0.41019774884719234, -0.8056988659499105)), keep=Keep.TOP, mode=Mode.PRIVATE)
    add(fillet2_piece_8)
    with BuildSketch(Plane(origin=(-10, -29.14187286, 5.04969261), x_dir=(0, -0.7213977238592156, -0.692520991747357), z_dir=(0, -0.692520991747357, 0.7213977238592156)), Plane(origin=(-10, -27.395778569, 7.562788348), x_dir=(0, 0.7213977238592154, 0.6925209917473572), z_dir=(0, 0.6925209917473573, -0.7213977238592155))) as fillet2_piece_9:
        with BuildLine():
            CenterArc((FILLET2_R, FILLET2_R), FILLET2_R, 180, 90)
            Line((0, FILLET2_R), (0, 0))
            Line((0, 0), (FILLET2_R, 0))
        make_face()
    extrude(amount=0.603734595)
    # the kernel refuses this fillet: 3 mm, written as the material it takes off along each edge
    with BuildSketch(Plane(origin=(2, -37.9799302, 43.136270147), x_dir=(-1, 0, 0), z_dir=(0, 0.6925209917473576, -0.7213977238592151))) as fillet2_2_piece_1:
        with BuildLine():
            CenterArc((FILLET2_R, -FILLET2_R), FILLET2_R, 90, 90)
            Line((0, -FILLET2_R), (0, 0))
            Line((0, 0), (FILLET2_R, 0))
        make_face()
    extrude(amount=23.12479764, mode=Mode.SUBTRACT)
    with BuildSketch(Plane(origin=(2, -36.393476881, 12.603673929), x_dir=(0, 0.7213977238592156, 0.692520991747357), z_dir=(0, -0.692520991747357, 0.7213977238592156))) as fillet2_2_piece_2:
        with BuildLine():
            CenterArc((FILLET2_R, FILLET2_R), FILLET2_R, 180, 90)
            Line((0, FILLET2_R), (0, 0))
            Line((0, 0), (FILLET2_R, 0))
        make_face()
    extrude(amount=23.12479764, mode=Mode.SUBTRACT)
    with BuildSketch(Plane(origin=(26.267904994, -21.786786559, 2), x_dir=(-0.692520991747357, -0.7213977238592156, 0), z_dir=(0.7213977238592156, -0.692520991747357, 0))) as fillet2_2_piece_3:
        with BuildLine():
            CenterArc((FILLET2_R, FILLET2_R), FILLET2_R, 180, 90)
            Line((0, FILLET2_R), (0, 0))
            Line((0, 0), (FILLET2_R, 0))
        make_face()
    extrude(amount=23.38289212, mode=Mode.SUBTRACT)
    with BuildSketch(Plane(origin=(29.285850312, -52.407884677, 2), x_dir=(0, 0, -1), z_dir=(-0.7213977238592156, 0.6925209917473572, 0))) as fillet2_2_piece_4:
        with BuildLine():
            CenterArc((FILLET2_R, -FILLET2_R), FILLET2_R, 90, 90)
            Line((0, -FILLET2_R), (0, 0))
            Line((0, 0), (FILLET2_R, 0))
        make_face()
    extrude(amount=23.38289212, mode=Mode.SUBTRACT)

    # Sketch22 → Cut-Extrude12 (cut)
    with BuildSketch(Plane(origin=(0, 5, 0), x_dir=(1, 0, 0), z_dir=(0, 1, 0))):
        with Locations(Location((-25, -15, 0), (0, 0, 270))):
            Circle(SKETCH22_R)
        with Locations(Location((-45, -3, 0), (0, 0, 270))):
            Circle(SKETCH22_R)
    extrude(amount=-CUT_EXTRUDE12_DEPTH, mode=Mode.SUBTRACT)

    # Sketch30 → Boss-Extrude8 (add)
    with BuildSketch(Plane.ZY.offset(15)):
        with Locations((10.5, -19.5)):
            Rectangle(SKETCH30_W, SKETCH30_H)
    extrude(amount=BOSS_EXTRUDE8_DEPTH)

    # Rib13 outline → Rib13 (add)
    with BuildSketch(Plane.XY.offset(31).offset(RIB13_START)):
        Polygon((-52, 0), (-52, -21), (-15, -35), (-15, 0), align=None)
    extrude(amount=RIB13_DEPTH)

    # Rib14 outline → Rib14 (add)
    with BuildSketch(Plane(origin=(0, 0, -10), x_dir=(-1, 0, 0), z_dir=(0, 0, -1)).offset(RIB14_START)):
        Polygon((52, -21), (52, 0), (15, 0), (15, -35), align=None)
    extrude(amount=RIB14_DEPTH)

    # Chamfer1
    # the kernel refuses this chamfer: 4 mm, written as the material it takes off along each edge
    with BuildSketch(Plane(origin=(-52, -31.286731952, -10), x_dir=(-0.02749587661058563, 0, 0.9996219169112968), z_dir=(0, 1, 0))) as chamfer1_piece_1:
        Polygon((CHAMFER1_SIZE * 0.999621916911, CHAMFER1_SIZE * 0.0274958766106), (-CHAMFER1_SIZE * 0.0274958766106, CHAMFER1_SIZE * 0.999621916911), (0, 0), align=None)
    extrude(amount=46.573463904, mode=Mode.SUBTRACT)
    with BuildSketch(Plane(origin=(-52, 15.286731952, 31), x_dir=(0.9996219169112968, 0, 0.02749587661058651), z_dir=(0, -1, 0))) as chamfer1_piece_2:
        Polygon((CHAMFER1_SIZE * 0.999621916911, -CHAMFER1_SIZE * 0.0274958766106), (-CHAMFER1_SIZE * 0.0274958766106, -CHAMFER1_SIZE * 0.999621916911), (0, 0), align=None)
    extrude(amount=46.573463904, mode=Mode.SUBTRACT)

    # Cut-Extrude13: up to this face of the body (flat: up to its plane)
    cut_extrude13_end = Plane(part.part.faces().sort_by_distance((15.244966533, 0, 15.244966533))[0])
    # Sketch26 → Cut-Extrude13 (cut, up to the picked face)
    with BuildSketch(Plane.XZ.offset(60), mode=Mode.PRIVATE) as cut_extrude13_sk1:
        Rectangle(SKETCH26_W, SKETCH26_H)
    cut_extrude13_tool1 = split(extrude(cut_extrude13_sk1.sketch, amount=-CUT_EXTRUDE13_REACH, mode=Mode.PRIVATE), bisect_by=cut_extrude13_end, keep=Keep.BOTH, mode=Mode.PRIVATE)
    add(cut_extrude13_tool1.solids().sort_by(Axis((0, -60, 0), (0, 1, 0)))[0], mode=Mode.SUBTRACT)

    # Cut-Extrude14: up to this face of the body (flat: up to its plane)
    cut_extrude14_end = Plane(part.part.faces().sort_by_distance((-10, -24.374225062, 13.832072415))[0])
    # Sketch27 → Cut-Extrude14 (cut, up to the picked face)
    with BuildSketch(Plane(origin=(50, 0, 0), x_dir=(0, 0, -1), z_dir=(1, 0, 0)), mode=Mode.PRIVATE) as cut_extrude14_sk1:
        with Locations((0, -10)):
            Rectangle(SKETCH27_W, SKETCH27_H)
    cut_extrude14_tool1 = split(extrude(cut_extrude14_sk1.sketch, amount=-CUT_EXTRUDE14_REACH, mode=Mode.PRIVATE), bisect_by=cut_extrude14_end, keep=Keep.BOTH, mode=Mode.PRIVATE)
    add(cut_extrude14_tool1.solids().sort_by(Axis((50, -10, 0), (-1, 0, 0)))[0], mode=Mode.SUBTRACT)

    # Sketch28 → Cut-Extrude15 (cut)
    with BuildSketch(Plane.XY.offset(50)):
        with Locations((0, -10)):
            Rectangle(SKETCH28_W, SKETCH28_H)
    extrude(amount=-CUT_EXTRUDE15_DEPTH, mode=Mode.SUBTRACT)

    # Sketch31 → Cut-Extrude17 (cut)
    with BuildSketch(Plane(origin=(0, -18, 0), x_dir=(1, 0, 0), z_dir=(0, 1, 0))):
        with Locations(Location((-45, -3, 0), (0, 0, 270))):
            Circle(SKETCH31_R)
        with Locations(Location((-25, -15, 0), (0, 0, 270))):
            Circle(SKETCH31_R)
    extrude(amount=-CUT_EXTRUDE17_DEPTH, mode=Mode.SUBTRACT)

    # Chamfer2
    chamfer2_edges = [part.edges().sort_by_distance(p)[0] for p in [
        (-33, -18, -7),
        (-15, -18, 10.5),
        (-33, -18, 28),
    ]]
    chamfer(chamfer2_edges, length=CHAMFER2_SIZE)


solid = part.part
